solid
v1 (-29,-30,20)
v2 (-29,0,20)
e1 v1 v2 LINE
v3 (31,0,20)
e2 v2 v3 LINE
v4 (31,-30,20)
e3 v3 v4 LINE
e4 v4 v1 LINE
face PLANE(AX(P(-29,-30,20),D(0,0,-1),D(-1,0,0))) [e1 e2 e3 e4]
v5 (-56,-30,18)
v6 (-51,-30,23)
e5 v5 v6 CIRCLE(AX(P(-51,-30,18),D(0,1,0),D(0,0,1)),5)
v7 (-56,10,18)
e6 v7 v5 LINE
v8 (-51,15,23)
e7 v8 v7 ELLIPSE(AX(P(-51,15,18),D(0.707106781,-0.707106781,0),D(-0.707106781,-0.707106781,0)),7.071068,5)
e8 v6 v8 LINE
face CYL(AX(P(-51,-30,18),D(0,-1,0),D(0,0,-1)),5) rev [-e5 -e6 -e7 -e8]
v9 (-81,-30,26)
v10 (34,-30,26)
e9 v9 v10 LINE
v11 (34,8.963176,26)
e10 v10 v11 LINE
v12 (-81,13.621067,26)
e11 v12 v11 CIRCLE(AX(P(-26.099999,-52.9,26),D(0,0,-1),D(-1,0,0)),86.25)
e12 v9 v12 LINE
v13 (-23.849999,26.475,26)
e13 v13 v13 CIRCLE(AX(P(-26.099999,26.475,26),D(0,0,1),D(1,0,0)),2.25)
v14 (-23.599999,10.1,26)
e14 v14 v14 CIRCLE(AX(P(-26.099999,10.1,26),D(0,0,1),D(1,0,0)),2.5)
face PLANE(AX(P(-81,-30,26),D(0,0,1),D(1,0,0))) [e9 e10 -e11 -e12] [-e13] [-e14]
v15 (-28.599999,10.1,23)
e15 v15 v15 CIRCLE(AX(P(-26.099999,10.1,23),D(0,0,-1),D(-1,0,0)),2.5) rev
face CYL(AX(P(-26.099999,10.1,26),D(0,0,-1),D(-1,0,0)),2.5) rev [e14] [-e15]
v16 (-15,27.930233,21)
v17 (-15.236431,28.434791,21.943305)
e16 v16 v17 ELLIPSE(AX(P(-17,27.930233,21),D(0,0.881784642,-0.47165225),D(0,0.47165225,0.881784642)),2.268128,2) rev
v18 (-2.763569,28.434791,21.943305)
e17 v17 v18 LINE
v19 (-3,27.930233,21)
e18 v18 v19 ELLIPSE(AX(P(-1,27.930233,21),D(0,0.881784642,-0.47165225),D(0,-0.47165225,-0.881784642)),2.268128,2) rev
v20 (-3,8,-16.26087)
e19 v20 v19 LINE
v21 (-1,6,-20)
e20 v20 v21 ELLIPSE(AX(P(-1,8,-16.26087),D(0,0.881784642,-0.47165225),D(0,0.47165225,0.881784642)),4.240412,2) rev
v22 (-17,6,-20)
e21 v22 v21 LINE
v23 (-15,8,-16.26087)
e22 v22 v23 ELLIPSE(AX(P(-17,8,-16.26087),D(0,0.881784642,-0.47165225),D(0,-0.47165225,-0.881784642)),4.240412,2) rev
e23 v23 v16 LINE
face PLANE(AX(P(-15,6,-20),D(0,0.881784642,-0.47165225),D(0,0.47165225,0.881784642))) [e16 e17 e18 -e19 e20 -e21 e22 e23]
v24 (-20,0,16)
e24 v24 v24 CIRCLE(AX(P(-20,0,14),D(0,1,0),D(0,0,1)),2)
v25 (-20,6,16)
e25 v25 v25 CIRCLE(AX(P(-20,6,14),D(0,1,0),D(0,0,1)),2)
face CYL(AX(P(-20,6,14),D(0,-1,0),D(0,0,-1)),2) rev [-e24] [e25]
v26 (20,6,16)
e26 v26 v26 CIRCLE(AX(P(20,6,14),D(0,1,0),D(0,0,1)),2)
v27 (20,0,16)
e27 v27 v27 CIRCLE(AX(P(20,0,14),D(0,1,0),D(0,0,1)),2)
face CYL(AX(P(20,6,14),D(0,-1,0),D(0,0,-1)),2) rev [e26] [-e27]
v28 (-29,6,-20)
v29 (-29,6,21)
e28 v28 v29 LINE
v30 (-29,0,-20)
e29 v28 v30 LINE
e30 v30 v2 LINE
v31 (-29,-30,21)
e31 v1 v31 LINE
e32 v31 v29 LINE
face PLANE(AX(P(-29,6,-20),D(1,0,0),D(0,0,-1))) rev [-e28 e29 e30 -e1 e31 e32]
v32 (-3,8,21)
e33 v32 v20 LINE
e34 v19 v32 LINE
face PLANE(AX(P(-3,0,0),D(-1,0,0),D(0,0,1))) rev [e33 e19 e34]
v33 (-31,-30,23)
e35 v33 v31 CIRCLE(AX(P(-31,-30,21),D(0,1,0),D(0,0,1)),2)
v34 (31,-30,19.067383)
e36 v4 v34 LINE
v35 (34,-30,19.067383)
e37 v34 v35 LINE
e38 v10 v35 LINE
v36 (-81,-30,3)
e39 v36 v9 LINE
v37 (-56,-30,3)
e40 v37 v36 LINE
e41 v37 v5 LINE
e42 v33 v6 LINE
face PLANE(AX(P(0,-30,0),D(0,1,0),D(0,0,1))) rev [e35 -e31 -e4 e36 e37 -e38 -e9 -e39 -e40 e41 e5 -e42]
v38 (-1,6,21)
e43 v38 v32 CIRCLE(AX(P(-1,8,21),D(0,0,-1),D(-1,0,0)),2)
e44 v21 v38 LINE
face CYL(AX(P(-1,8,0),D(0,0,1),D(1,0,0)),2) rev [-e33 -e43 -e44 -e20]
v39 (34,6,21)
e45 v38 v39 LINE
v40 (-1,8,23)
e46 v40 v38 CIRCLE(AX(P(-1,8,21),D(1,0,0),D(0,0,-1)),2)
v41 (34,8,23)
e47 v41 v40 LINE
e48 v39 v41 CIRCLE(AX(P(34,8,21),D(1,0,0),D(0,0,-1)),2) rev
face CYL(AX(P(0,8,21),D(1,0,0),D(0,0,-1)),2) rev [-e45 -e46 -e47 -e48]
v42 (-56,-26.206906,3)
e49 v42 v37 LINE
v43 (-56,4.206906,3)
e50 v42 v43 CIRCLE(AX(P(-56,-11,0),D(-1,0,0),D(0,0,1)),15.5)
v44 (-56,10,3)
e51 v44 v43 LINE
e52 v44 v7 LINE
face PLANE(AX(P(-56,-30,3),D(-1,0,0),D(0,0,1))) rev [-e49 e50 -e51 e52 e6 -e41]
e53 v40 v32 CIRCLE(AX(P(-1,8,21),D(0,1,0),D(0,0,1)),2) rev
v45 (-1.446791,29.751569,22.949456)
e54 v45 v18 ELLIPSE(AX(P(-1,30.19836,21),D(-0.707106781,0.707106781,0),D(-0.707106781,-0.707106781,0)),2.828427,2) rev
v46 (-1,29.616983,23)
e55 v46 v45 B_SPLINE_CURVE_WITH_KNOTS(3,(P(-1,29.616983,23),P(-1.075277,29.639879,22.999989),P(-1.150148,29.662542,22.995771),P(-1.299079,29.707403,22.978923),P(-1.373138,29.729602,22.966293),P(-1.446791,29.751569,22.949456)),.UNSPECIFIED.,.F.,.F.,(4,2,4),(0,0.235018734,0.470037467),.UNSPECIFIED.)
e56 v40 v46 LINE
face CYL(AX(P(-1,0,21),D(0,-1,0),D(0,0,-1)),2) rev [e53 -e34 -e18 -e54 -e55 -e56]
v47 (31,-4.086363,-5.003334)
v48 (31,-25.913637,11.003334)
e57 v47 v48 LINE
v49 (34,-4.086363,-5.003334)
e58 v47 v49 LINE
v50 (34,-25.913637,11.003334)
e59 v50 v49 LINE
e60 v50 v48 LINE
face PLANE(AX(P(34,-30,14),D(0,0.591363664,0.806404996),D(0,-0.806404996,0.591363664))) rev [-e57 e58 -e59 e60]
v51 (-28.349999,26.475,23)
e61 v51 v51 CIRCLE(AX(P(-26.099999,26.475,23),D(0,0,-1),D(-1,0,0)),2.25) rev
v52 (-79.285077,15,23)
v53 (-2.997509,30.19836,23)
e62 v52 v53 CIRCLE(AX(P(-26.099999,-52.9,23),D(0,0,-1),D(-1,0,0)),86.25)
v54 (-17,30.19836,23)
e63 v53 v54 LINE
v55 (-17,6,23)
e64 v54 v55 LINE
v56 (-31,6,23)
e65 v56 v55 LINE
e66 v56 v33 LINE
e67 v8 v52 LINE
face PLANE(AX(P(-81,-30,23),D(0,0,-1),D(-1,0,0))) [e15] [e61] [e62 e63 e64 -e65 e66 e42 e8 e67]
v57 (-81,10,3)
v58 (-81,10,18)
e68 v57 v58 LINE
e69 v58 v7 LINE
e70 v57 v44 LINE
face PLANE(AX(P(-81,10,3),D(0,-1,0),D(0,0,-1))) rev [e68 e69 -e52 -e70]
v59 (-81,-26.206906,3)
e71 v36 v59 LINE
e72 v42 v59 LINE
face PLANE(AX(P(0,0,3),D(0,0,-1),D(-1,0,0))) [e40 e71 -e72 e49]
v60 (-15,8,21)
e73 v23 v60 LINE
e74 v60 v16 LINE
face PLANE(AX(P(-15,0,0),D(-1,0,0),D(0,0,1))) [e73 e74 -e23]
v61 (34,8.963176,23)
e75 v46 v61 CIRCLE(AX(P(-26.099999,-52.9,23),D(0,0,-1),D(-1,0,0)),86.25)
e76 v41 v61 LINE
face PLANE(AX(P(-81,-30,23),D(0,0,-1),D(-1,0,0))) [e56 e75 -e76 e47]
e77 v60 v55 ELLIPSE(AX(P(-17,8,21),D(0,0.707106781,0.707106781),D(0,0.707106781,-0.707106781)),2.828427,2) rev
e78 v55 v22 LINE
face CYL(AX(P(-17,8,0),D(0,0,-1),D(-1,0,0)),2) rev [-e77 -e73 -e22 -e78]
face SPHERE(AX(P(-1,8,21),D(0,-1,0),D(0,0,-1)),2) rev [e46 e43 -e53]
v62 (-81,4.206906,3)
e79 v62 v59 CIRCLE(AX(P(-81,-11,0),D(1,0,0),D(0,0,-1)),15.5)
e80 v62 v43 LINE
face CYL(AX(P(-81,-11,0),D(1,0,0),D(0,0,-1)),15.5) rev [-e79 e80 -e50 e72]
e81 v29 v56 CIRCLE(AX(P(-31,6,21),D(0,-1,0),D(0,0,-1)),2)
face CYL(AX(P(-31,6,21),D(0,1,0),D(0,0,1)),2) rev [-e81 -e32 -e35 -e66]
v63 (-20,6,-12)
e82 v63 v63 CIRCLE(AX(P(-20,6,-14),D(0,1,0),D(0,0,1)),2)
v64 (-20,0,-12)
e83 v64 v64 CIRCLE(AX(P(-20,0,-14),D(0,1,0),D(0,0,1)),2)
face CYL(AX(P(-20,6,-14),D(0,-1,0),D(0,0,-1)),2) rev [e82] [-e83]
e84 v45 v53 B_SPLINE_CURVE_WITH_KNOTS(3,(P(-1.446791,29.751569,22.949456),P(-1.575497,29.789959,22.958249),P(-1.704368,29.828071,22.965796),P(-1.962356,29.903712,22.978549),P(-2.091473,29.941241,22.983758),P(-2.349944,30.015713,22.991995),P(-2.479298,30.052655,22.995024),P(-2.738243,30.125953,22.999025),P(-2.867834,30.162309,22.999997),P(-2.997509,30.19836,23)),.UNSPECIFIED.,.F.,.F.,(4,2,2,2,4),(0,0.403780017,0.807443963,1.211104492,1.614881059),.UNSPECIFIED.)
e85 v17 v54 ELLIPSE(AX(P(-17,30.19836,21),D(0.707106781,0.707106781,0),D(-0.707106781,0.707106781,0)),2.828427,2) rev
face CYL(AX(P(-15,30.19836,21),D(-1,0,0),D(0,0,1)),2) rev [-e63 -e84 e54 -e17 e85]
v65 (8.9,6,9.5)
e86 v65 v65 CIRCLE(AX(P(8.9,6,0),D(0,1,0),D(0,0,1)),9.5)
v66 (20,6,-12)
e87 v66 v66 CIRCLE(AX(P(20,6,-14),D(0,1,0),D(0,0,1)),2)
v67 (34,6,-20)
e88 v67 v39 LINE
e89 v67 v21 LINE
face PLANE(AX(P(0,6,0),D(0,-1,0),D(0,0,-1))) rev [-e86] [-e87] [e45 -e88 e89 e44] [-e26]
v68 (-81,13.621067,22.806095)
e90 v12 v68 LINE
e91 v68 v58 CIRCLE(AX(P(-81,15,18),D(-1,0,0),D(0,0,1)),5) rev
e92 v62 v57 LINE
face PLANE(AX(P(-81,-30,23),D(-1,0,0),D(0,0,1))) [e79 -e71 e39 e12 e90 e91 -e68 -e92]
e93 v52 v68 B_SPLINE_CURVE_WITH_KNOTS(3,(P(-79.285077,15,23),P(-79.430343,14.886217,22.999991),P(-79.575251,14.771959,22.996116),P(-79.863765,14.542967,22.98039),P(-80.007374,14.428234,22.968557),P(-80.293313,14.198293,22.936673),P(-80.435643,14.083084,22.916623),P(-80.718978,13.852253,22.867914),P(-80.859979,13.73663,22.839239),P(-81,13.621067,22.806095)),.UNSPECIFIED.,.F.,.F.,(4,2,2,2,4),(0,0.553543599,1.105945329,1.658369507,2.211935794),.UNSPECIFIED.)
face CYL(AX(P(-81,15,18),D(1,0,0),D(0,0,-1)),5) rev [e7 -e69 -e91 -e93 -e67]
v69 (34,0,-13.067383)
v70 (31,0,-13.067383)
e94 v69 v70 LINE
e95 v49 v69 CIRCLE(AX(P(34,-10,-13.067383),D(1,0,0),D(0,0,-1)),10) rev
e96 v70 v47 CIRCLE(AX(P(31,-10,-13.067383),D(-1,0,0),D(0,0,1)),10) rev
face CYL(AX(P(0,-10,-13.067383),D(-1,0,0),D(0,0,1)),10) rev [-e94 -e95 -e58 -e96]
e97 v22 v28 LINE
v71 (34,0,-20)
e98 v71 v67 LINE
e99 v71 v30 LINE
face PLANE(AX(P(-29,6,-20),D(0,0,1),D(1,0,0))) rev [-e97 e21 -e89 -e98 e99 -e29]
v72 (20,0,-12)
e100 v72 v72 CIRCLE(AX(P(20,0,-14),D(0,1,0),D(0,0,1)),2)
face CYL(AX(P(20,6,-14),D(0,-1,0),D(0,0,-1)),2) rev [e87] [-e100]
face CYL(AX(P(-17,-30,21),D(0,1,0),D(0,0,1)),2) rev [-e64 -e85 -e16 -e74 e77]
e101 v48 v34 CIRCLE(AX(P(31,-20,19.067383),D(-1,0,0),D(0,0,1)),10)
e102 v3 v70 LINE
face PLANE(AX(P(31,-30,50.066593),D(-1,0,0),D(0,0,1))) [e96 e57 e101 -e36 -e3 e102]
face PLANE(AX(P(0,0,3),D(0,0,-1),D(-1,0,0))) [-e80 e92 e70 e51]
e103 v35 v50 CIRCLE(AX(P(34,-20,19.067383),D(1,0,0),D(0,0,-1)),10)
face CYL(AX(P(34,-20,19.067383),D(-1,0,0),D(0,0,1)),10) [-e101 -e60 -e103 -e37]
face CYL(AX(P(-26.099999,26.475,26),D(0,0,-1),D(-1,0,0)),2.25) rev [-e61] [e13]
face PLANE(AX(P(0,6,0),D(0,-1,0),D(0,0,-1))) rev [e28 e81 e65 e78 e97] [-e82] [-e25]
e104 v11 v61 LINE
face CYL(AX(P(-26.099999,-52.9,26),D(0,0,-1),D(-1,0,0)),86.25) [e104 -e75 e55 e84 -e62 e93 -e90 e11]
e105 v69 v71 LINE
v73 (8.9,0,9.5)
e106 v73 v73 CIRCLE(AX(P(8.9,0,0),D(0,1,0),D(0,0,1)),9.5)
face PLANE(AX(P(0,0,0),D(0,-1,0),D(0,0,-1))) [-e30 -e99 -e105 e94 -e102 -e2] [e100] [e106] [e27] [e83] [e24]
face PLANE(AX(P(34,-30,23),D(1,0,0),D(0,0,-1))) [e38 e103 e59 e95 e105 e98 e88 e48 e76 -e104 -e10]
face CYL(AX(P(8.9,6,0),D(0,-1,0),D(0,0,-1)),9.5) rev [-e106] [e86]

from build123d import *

# Parameters (mm, degrees)
SKETCH2_W                      = 58
SKETCH2_H                      = 40
SKETCH2_R                      = 2
SKETCH2_R_2                    = 9.5
BOSS_EXTRUDE1_DEPTH            = 6
BOSS_EXTRUDE2_DEPTH            = 6
BOSS_EXTRUDE2_DEPTH_BACK       = 30
SKETCH3_W                      = 58
SKETCH3_H                      = 3
BOSS_EXTRUDE4_DEPTH            = 39
BOSS_EXTRUDE4_DEPTH_BACK       = 30
SKETCH7_W                      = 115
SKETCH7_H                      = 3
CUT_EXTRUDE1_DEPTH             = 94.584186698
SKETCH5_R                      = 2.25
SKETCH5_R_2                    = 2.5
CUT_EXTRUDE2_DEPTH             = 92.374080023
BOSS_EXTRUDE3_DEPTH            = 10
BOSS_EXTRUDE3_DEPTH_BACK       = 2
SKETCH8_W                      = 25
SKETCH8_H                      = 40
BOSS_EXTRUDE5_DEPTH            = 20
SKETCH9_R                      = 15.499999921
CUT_EXTRUDE3_DEPTH             = 80.228924642
BOSS_EXTRUDE6_DEPTH            = 5
FILLET2_R                      = 5
CUT_EXTRUDE4_REACH             = 93.374
SKETCH12_W                     = 2
SKETCH12_H                     = 30
CUT_EXTRUDE4_DIRECTION_2_DEPTH = 92.374080176
FILLET1_R                      = 2
FILLET3_R                      = 10


with BuildPart() as part:
    # Sketch2 → Boss-Extrude1 (new body)
    with BuildSketch(Plane(origin=(0, 0, 0), x_dir=(1, 0, 0), z_dir=(0, 1, 0))):
        Rectangle(SKETCH2_W, SKETCH2_H)
        with Locations(Location((-20, 14, 0), (0, 0, 270))):
            Circle(SKETCH2_R, mode=Mode.SUBTRACT)
        with Locations(Location((20, 14, 0), (0, 0, 270))):
            Circle(SKETCH2_R, mode=Mode.SUBTRACT)
        with Locations(Location((20, -14, 0), (0, 0, 270))):
            Circle(SKETCH2_R, mode=Mode.SUBTRACT)
        with Locations(Location((-20, -14, 0), (0, 0, 270))):
            Circle(SKETCH2_R, mode=Mode.SUBTRACT)
        with Locations(Location((8.9, 0, 0), (0, 0, 270))):
            Circle(SKETCH2_R_2, mode=Mode.SUBTRACT)
    extrude(amount=BOSS_EXTRUDE1_DEPTH)

    # Sketch3 → Boss-Extrude2 (add, two sides: drawn at the far end of the back side and taken through both)
    with BuildSketch(Plane(origin=(0, 0, 0), x_dir=(1, 0, 0), z_dir=(0, 1, 0)).offset(-BOSS_EXTRUDE2_DEPTH_BACK)):
        with Locations((0, -21.5)):
            Rectangle(SKETCH3_W, SKETCH3_H)
    extrude(amount=BOSS_EXTRUDE2_DEPTH + BOSS_EXTRUDE2_DEPTH_BACK)

    # Sketch7 → Boss-Extrude4 (add, two sides: drawn at the far end of the back side and taken through both)
    with BuildSketch(Plane(origin=(0, 0, 0), x_dir=(1, 0, 0), z_dir=(0, 1, 0)).offset(-BOSS_EXTRUDE4_DEPTH_BACK)):
        with Locations((-23.5, -24.5)):
            Rectangle(SKETCH7_W, SKETCH7_H)
    extrude(amount=BOSS_EXTRUDE4_DEPTH + BOSS_EXTRUDE4_DEPTH_BACK)

    # Sketch4 → Cut-Extrude1 (cut, through all)
    with BuildSketch(Plane.XY):
        with BuildLine():
            Line((-81, 13.621067419), (-81, 45.200754785))
            Line((-81, 45.200754785), (34, 45.200754785))
            Line((34, 45.200754785), (34, 8.963176429))
            ThreePointArc((34, 8.963176429), (-22.609442943, 33.279339271), (-81, 13.621067419))
        make_face()
    extrude(amount=CUT_EXTRUDE1_DEPTH, mode=Mode.SUBTRACT)

    # Sketch5 → Cut-Extrude2 (cut, through all)
    with BuildSketch(Plane.XY):
        with Locations(Location((-26.099999185, 26.475, 0), (0, 0, 180))):
            Circle(SKETCH5_R)
        with Locations(Location((-26.099999185, 10.1, 0), (0, 0, 180))):
            Circle(SKETCH5_R_2)
    extrude(amount=CUT_EXTRUDE2_DEPTH, mode=Mode.SUBTRACT)

    # Sketch6 → Boss-Extrude3 (add, two sides: drawn at the far end of the back side and taken through both)
    with BuildSketch(Plane(origin=(-13, 0, 0), x_dir=(0, 0, -1), z_dir=(1, 0, 0)).offset(-BOSS_EXTRUDE3_DEPTH_BACK)):
        Polygon((20, 6), (-23, 29), (-23, 6), align=None)
    extrude(amount=BOSS_EXTRUDE3_DEPTH + BOSS_EXTRUDE3_DEPTH_BACK)

    # Sketch8 → Boss-Extrude5 (add)
    with BuildSketch(Plane(origin=(0, 0, 23), x_dir=(-1, 0, 0), z_dir=(0, 0, -1))):
        with Locations((68.5, -10)):
            Rectangle(SKETCH8_W, SKETCH8_H)
    extrude(amount=BOSS_EXTRUDE5_DEPTH)

    # Sketch9 → Cut-Extrude3 (cut, through all)
    with BuildSketch(Plane(origin=(-33, 0, 0), x_dir=(0, 0, -1), z_dir=(1, 0, 0))):
        with Locations((-2.25e-07, -11)):
            Circle(SKETCH9_R)
    extrude(amount=-CUT_EXTRUDE3_DEPTH, mode=Mode.SUBTRACT)

    # Sketch10 → Boss-Extrude6 (add)
    with BuildSketch(Plane(origin=(29, 0, 0), x_dir=(0, 0, -1), z_dir=(1, 0, 0))):
        Polygon((20, 0), (20, 6), (-26, 6), (-26, -30), (-14, -30), (8, 0), align=None)
    extrude(amount=BOSS_EXTRUDE6_DEPTH)

    # Fillet2
    fillet2_edges = [part.edges().sort_by_distance(p)[0] for p in [
        (-68.5, 10, 23),
        (-56, -10, 23),
    ]]
    fillet(fillet2_edges, radius=FILLET2_R)

    # Cut-Extrude4: up to this face of the body (flat: up to its plane)
    cut_extrude4_end = Plane(part.part.faces().sort_by_distance((0, -15, 20))[0])
    # Sketch12 → Cut-Extrude4 (cut, up to the picked face)
    with BuildSketch(Plane.XY, mode=Mode.PRIVATE) as cut_extrude4_sk1:
        with Locations((30, -15)):
            Rectangle(SKETCH12_W, SKETCH12_H)
    cut_extrude4_tool1 = split(extrude(cut_extrude4_sk1.sketch, amount=CUT_EXTRUDE4_REACH, mode=Mode.PRIVATE), bisect_by=cut_extrude4_end, keep=Keep.BOTH, mode=Mode.PRIVATE)
    add(cut_extrude4_tool1.solids().sort_by(Axis((30, -15, 0), (0, 0, 1)))[0], mode=Mode.SUBTRACT)

    # Sketch12 → Cut-Extrude4 direction 2 (cut)
    with BuildSketch(Plane.XY):
        with Locations((30, -15)):
            Rectangle(SKETCH12_W, SKETCH12_H)
    extrude(amount=-CUT_EXTRUDE4_DIRECTION_2_DEPTH, mode=Mode.SUBTRACT)

    # Fillet1
    # the kernel refuses this fillet: 2 mm, written as the material it adds along each edge
    with BuildSketch(Plane(origin=(-1, 8, 21), x_dir=(-1, 0, 0), z_dir=(0, 0, 1))) as fillet1_piece_1_section:
        Polygon((0, 0), (FILLET1_R * 1.02, 0), (FILLET1_R * 1.02, FILLET1_R * 1.02), (0, FILLET1_R * 1.02), align=None)
    fillet1_piece_1 = extrude(amount=FILLET1_R * 1.02, mode=Mode.PRIVATE)
    fillet1_piece_1 = fillet1_piece_1 - Plane(origin=(-1, 8, 21), x_dir=(0.7071067811865475, 0.7071067811865475, 0), z_dir=(0, 0, 1)) * Sphere(FILLET1_R, mode=Mode.PRIVATE)
    add(fillet1_piece_1)
    with BuildSketch(Plane(origin=(-15, 6, 23), x_dir=(0, 1, 0), z_dir=(0, 0, -1))) as fillet1_piece_2_section:
        with BuildLine():
            CenterArc((FILLET1_R, -FILLET1_R), FILLET1_R, 90, 90)
            Line((0, -FILLET1_R), (-FILLET1_R * 0.02, -FILLET1_R))
            Line((-FILLET1_R * 0.02, -FILLET1_R), (-FILLET1_R * 0.02, FILLET1_R * 0.02))
            Line((-FILLET1_R * 0.02, FILLET1_R * 0.02), (FILLET1_R, FILLET1_R * 0.02))
            Line((FILLET1_R, FILLET1_R * 0.02), (FILLET1_R, 0))
        make_face()
    fillet1_piece_2 = extrude(amount=43, mode=Mode.PRIVATE)
    fillet1_piece_2 = split(fillet1_piece_2, bisect_by=Plane(origin=(-15.457624132, 15.214131113, -2.773580962), z_dir=(0, -0.8817846419346917, 0.47165225033716063)), keep=Keep.TOP, mode=Mode.PRIVATE)
    add(fillet1_piece_2)
    with BuildSketch(Plane(origin=(-3, 6, 21), x_dir=(0, 1, 0), z_dir=(0, 0, -1))) as fillet1_piece_3_section:
        with BuildLine():
            CenterArc((FILLET1_R, FILLET1_R), FILLET1_R, 180, 90)
            Line((0, FILLET1_R), (-FILLET1_R * 0.02, FILLET1_R))
            Line((-FILLET1_R * 0.02, FILLET1_R), (-FILLET1_R * 0.02, -FILLET1_R * 0.02))
            Line((-FILLET1_R * 0.02, -FILLET1_R * 0.02), (FILLET1_R, -FILLET1_R * 0.02))
            Line((FILLET1_R, -FILLET1_R * 0.02), (FILLET1_R, 0))
        make_face()
    fillet1_piece_3 = extrude(amount=41, mode=Mode.PRIVATE)
    fillet1_piece_3 = split(fillet1_piece_3, bisect_by=Plane(origin=(-2.542135078, 14.797986004, -3.551591383), z_dir=(0, -0.8817846419346917, 0.47165225033716063)), keep=Keep.TOP, mode=Mode.PRIVATE)
    add(fillet1_piece_3)
    with BuildSketch(Plane(origin=(-3, 34, 23), x_dir=(1, 0, 0), z_dir=(0, -1, 0))) as fillet1_piece_4_section:
        with BuildLine():
            CenterArc((FILLET1_R, -FILLET1_R), FILLET1_R, 90, 90)
            Line((0, -FILLET1_R), (-FILLET1_R * 0.02, -FILLET1_R))
            Line((-FILLET1_R * 0.02, -FILLET1_R), (-FILLET1_R * 0.02, FILLET1_R * 0.02))
            Line((-FILLET1_R * 0.02, FILLET1_R * 0.02), (FILLET1_R, FILLET1_R * 0.02))
            Line((FILLET1_R, FILLET1_R * 0.02), (FILLET1_R, 0))
        make_face()
    fillet1_piece_4 = extrude(amount=26, mode=Mode.PRIVATE)
    fillet1_piece_4 = split(fillet1_piece_4, bisect_by=Plane(origin=(-2.544379772, 26.451239118, 18.234925307), z_dir=(0, -0.8817846419346917, 0.47165225033716063)), keep=Keep.TOP, mode=Mode.PRIVATE)
    add(fillet1_piece_4)
    with BuildSketch(Plane(origin=(34, 6, 23), x_dir=(0, 1, 0), z_dir=(-1, 0, 0))) as fillet1_piece_5:
        with BuildLine():
            CenterArc((FILLET1_R, FILLET1_R), FILLET1_R, 180, 90)
            Line((0, FILLET1_R), (-FILLET1_R * 0.02, FILLET1_R))
            Line((-FILLET1_R * 0.02, FILLET1_R), (-FILLET1_R * 0.02, -FILLET1_R * 0.02))
            Line((-FILLET1_R * 0.02, -FILLET1_R * 0.02), (FILLET1_R, -FILLET1_R * 0.02))
            Line((FILLET1_R, -FILLET1_R * 0.02), (FILLET1_R, 0))
        make_face()
    extrude(amount=35)
    with BuildSketch(Plane(origin=(-15, 34, 23), x_dir=(-1, 0, 0), z_dir=(0, -1, 0))) as fillet1_piece_6_section:
        with BuildLine():
            CenterArc((FILLET1_R, FILLET1_R), FILLET1_R, 180, 90)
            Line((0, FILLET1_R), (-FILLET1_R * 0.02, FILLET1_R))
            Line((-FILLET1_R * 0.02, FILLET1_R), (-FILLET1_R * 0.02, -FILLET1_R * 0.02))
            Line((-FILLET1_R * 0.02, -FILLET1_R * 0.02), (FILLET1_R, -FILLET1_R * 0.02))
            Line((FILLET1_R, -FILLET1_R * 0.02), (FILLET1_R, 0))
        make_face()
    fillet1_piece_6 = extrude(amount=28, mode=Mode.PRIVATE)
    fillet1_piece_6 = split(fillet1_piece_6, bisect_by=Plane(origin=(-15.455371522, 26.228583138, 17.818655432), z_dir=(0, -0.8817846419346917, 0.47165225033716063)), keep=Keep.TOP, mode=Mode.PRIVATE)
    add(fillet1_piece_6)
    with BuildSketch(Plane(origin=(-29, -30, 23), x_dir=(-1, 0, 0), z_dir=(0, 1, 0))) as fillet1_piece_7:
        with BuildLine():
            CenterArc((FILLET1_R, -FILLET1_R), FILLET1_R, 90, 90)
            Line((0, -FILLET1_R), (-FILLET1_R * 0.02, -FILLET1_R))
            Line((-FILLET1_R * 0.02, -FILLET1_R), (-FILLET1_R * 0.02, FILLET1_R * 0.02))
            Line((-FILLET1_R * 0.02, FILLET1_R * 0.02), (FILLET1_R, FILLET1_R * 0.02))
            Line((FILLET1_R, FILLET1_R * 0.02), (FILLET1_R, 0))
        make_face()
    extrude(amount=36)
    with BuildSketch(Plane(origin=(-15, 29, 23), x_dir=(0, 1, 0), z_dir=(1, 0, 0))) as fillet1_piece_8:
        with BuildLine():
            CenterArc((FILLET1_R * 0.59918003165, -FILLET1_R), FILLET1_R, 90, 61.858398768)
            Line((-FILLET1_R * 0.282604610285, -FILLET1_R * 0.528347749663), (-FILLET1_R * 0.300240303123, -FILLET1_R * 0.518914704656))
            Line((-FILLET1_R * 0.300240303123, -FILLET1_R * 0.518914704656), (-FILLET1_R * 0.011983600633, FILLET1_R * 0.02))
            Line((-FILLET1_R * 0.011983600633, FILLET1_R * 0.02), (FILLET1_R * 0.59918003165, FILLET1_R * 0.02))
            Line((FILLET1_R * 0.59918003165, FILLET1_R * 0.02), (FILLET1_R * 0.59918003165, 0))
        make_face()
    extrude(amount=12)
    with BuildSketch(Plane(origin=(-15, 34, 23), x_dir=(-1, 0, 0), z_dir=(0, -1, 0))) as fillet1_piece_9a_section:
        with BuildLine():
            CenterArc((FILLET1_R, FILLET1_R), FILLET1_R, 180, 90)
            Line((0, FILLET1_R), (-FILLET1_R * 0.02, FILLET1_R))
            Line((-FILLET1_R * 0.02, FILLET1_R), (-FILLET1_R * 0.02, -FILLET1_R * 0.02))
            Line((-FILLET1_R * 0.02, -FILLET1_R * 0.02), (FILLET1_R, -FILLET1_R * 0.02))
            Line((FILLET1_R, -FILLET1_R * 0.02), (FILLET1_R, 0))
        make_face()
    fillet1_piece_9a = extrude(amount=33, mode=Mode.PRIVATE)
    fillet1_piece_9a = split(fillet1_piece_9a, bisect_by=Plane(origin=(-15.452790229, 6, 22.547209771), z_dir=(0, -1, 0)), keep=Keep.TOP, mode=Mode.PRIVATE)
    with BuildSketch(Plane(origin=(-15, 6, 28), x_dir=(0, 1, 0), z_dir=(0, 0, -1))) as fillet1_piece_9b_section:
        with BuildLine():
            CenterArc((FILLET1_R, -FILLET1_R), FILLET1_R, 90, 90)
            Line((0, -FILLET1_R), (-FILLET1_R * 0.02, -FILLET1_R))
            Line((-FILLET1_R * 0.02, -FILLET1_R), (-FILLET1_R * 0.02, FILLET1_R * 0.02))
            Line((-FILLET1_R * 0.02, FILLET1_R * 0.02), (FILLET1_R, FILLET1_R * 0.02))
            Line((FILLET1_R, FILLET1_R * 0.02), (FILLET1_R, 0))
        make_face()
    fillet1_piece_9b = extrude(amount=48, mode=Mode.PRIVATE)
    fillet1_piece_9b = split(fillet1_piece_9b, bisect_by=Plane(origin=(-15.452790229, 6.452790229, 23), z_dir=(0, 0, 1)), keep=Keep.TOP, mode=Mode.PRIVATE)
    fillet1_piece_9 = fillet1_piece_9a & fillet1_piece_9b
    add(fillet1_piece_9)
    with BuildSketch(Plane(origin=(-15, 29, 23), x_dir=(0, 1, 0), z_dir=(1, 0, 0))) as fillet1_piece_10a_section:
        with BuildLine():
            CenterArc((FILLET1_R * 0.59918003165, -FILLET1_R), FILLET1_R, 90, 61.858398768)
            Line((-FILLET1_R * 0.282604610285, -FILLET1_R * 0.528347749663), (-FILLET1_R * 0.300240303123, -FILLET1_R * 0.518914704656))
            Line((-FILLET1_R * 0.300240303123, -FILLET1_R * 0.518914704656), (-FILLET1_R * 0.011983600633, FILLET1_R * 0.02))
            Line((-FILLET1_R * 0.011983600633, FILLET1_R * 0.02), (FILLET1_R * 0.59918003165, FILLET1_R * 0.02))
            Line((FILLET1_R * 0.59918003165, FILLET1_R * 0.02), (FILLET1_R * 0.59918003165, 0))
        make_face()
    fillet1_piece_10a = extrude(amount=14.995900158, mode=Mode.PRIVATE)
    fillet1_piece_10a = fillet1_piece_10a & Plane(origin=(-26.099999185, -52.9, 22.74718016), x_dir=(0.6968115847591843, 0.717254219468519, 0), z_dir=(0, 0, -1)) * Cylinder(86.25, 35, mode=Mode.PRIVATE)
    fillet1_piece_10a = split(fillet1_piece_10a, bisect_by=Plane(origin=(-3, 29.068183889, 22.74718016), z_dir=(1, 0, 0)), keep=Keep.TOP, mode=Mode.PRIVATE)
    with BuildSketch(Plane(origin=(-3, 34, 23), x_dir=(1, 0, 0), z_dir=(0, -1, 0))) as fillet1_piece_10b_section:
        with BuildLine():
            CenterArc((FILLET1_R, -FILLET1_R), FILLET1_R, 90, 90)
            Line((0, -FILLET1_R), (-FILLET1_R * 0.02, -FILLET1_R))
            Line((-FILLET1_R * 0.02, -FILLET1_R), (-FILLET1_R * 0.02, FILLET1_R * 0.02))
            Line((-FILLET1_R * 0.02, FILLET1_R * 0.02), (FILLET1_R, FILLET1_R * 0.02))
            Line((FILLET1_R, FILLET1_R * 0.02), (FILLET1_R, 0))
        make_face()
    fillet1_piece_10b = extrude(amount=26, mode=Mode.PRIVATE)
    fillet1_piece_10b = fillet1_piece_10b & Plane(origin=(-26.099999185, -52.9, 22.447570128), x_dir=(0.6968115847591843, 0.717254219468519, 0), z_dir=(0, 0, -1)) * Cylinder(86.25, 60, mode=Mode.PRIVATE)
    fillet1_piece_10b = split(fillet1_piece_10b, bisect_by=Plane(origin=(-2.632601373, 28.859185521, 22.736738149), z_dir=(0, 0.8817846419346917, -0.47165225033716063)), keep=Keep.TOP, mode=Mode.PRIVATE)
    fillet1_piece_10 = fillet1_piece_10a & fillet1_piece_10b
    add(fillet1_piece_10)
    with BuildSketch(Plane(origin=(-15, 34, 23), x_dir=(-1, 0, 0), z_dir=(0, -1, 0))) as fillet1_piece_11a_section:
        with BuildLine():
            CenterArc((FILLET1_R, FILLET1_R), FILLET1_R, 180, 90)
            Line((0, FILLET1_R), (-FILLET1_R * 0.02, FILLET1_R))
            Line((-FILLET1_R * 0.02, FILLET1_R), (-FILLET1_R * 0.02, -FILLET1_R * 0.02))
            Line((-FILLET1_R * 0.02, -FILLET1_R * 0.02), (FILLET1_R, -FILLET1_R * 0.02))
            Line((FILLET1_R, -FILLET1_R * 0.02), (FILLET1_R, 0))
        make_face()
    fillet1_piece_11a = extrude(amount=28, mode=Mode.PRIVATE)
    fillet1_piece_11a = fillet1_piece_11a & Plane(origin=(-26.099999185, -52.9, 22.525345576), x_dir=(0.6968115847591843, 0.717254219468519, 0), z_dir=(0, 0, -1)) * Cylinder(86.25, 64, mode=Mode.PRIVATE)
    fillet1_piece_11a = split(fillet1_piece_11a, bisect_by=Plane(origin=(-15.443593733, 29.184571459, 23.34506838), z_dir=(0, 0.8817846419346917, -0.47165225033716063)), keep=Keep.TOP, mode=Mode.PRIVATE)
    with BuildSketch(Plane(origin=(-17.995900158, 29, 23), x_dir=(0, 1, 0), z_dir=(1, 0, 0))) as fillet1_piece_11b_section:
        with BuildLine():
            CenterArc((FILLET1_R * 0.59918003165, -FILLET1_R), FILLET1_R, 90, 61.858398768)
            Line((-FILLET1_R * 0.282604610285, -FILLET1_R * 0.528347749663), (-FILLET1_R * 0.300240303123, -FILLET1_R * 0.518914704656))
            Line((-FILLET1_R * 0.300240303123, -FILLET1_R * 0.518914704656), (-FILLET1_R * 0.011983600633, FILLET1_R * 0.02))
            Line((-FILLET1_R * 0.011983600633, FILLET1_R * 0.02), (FILLET1_R * 0.59918003165, FILLET1_R * 0.02))
            Line((FILLET1_R * 0.59918003165, FILLET1_R * 0.02), (FILLET1_R * 0.59918003165, 0))
        make_face()
    fillet1_piece_11b = extrude(amount=14.995900158, mode=Mode.PRIVATE)
    fillet1_piece_11b = split(fillet1_piece_11b, bisect_by=Plane(origin=(-15, 29.137483158, 22.770547831), z_dir=(-1, 0, 0)), keep=Keep.TOP, mode=Mode.PRIVATE)
    fillet1_piece_11 = fillet1_piece_11a & fillet1_piece_11b
    add(fillet1_piece_11)

    # Fillet3
    fillet3_edges = [part.edges().sort_by_distance(p)[0] for p in [
        (32.5, 0, -8),
        (32.5, -30, 14),
    ]]
    fillet(fillet3_edges, radius=FILLET3_R)


solid = part.part
